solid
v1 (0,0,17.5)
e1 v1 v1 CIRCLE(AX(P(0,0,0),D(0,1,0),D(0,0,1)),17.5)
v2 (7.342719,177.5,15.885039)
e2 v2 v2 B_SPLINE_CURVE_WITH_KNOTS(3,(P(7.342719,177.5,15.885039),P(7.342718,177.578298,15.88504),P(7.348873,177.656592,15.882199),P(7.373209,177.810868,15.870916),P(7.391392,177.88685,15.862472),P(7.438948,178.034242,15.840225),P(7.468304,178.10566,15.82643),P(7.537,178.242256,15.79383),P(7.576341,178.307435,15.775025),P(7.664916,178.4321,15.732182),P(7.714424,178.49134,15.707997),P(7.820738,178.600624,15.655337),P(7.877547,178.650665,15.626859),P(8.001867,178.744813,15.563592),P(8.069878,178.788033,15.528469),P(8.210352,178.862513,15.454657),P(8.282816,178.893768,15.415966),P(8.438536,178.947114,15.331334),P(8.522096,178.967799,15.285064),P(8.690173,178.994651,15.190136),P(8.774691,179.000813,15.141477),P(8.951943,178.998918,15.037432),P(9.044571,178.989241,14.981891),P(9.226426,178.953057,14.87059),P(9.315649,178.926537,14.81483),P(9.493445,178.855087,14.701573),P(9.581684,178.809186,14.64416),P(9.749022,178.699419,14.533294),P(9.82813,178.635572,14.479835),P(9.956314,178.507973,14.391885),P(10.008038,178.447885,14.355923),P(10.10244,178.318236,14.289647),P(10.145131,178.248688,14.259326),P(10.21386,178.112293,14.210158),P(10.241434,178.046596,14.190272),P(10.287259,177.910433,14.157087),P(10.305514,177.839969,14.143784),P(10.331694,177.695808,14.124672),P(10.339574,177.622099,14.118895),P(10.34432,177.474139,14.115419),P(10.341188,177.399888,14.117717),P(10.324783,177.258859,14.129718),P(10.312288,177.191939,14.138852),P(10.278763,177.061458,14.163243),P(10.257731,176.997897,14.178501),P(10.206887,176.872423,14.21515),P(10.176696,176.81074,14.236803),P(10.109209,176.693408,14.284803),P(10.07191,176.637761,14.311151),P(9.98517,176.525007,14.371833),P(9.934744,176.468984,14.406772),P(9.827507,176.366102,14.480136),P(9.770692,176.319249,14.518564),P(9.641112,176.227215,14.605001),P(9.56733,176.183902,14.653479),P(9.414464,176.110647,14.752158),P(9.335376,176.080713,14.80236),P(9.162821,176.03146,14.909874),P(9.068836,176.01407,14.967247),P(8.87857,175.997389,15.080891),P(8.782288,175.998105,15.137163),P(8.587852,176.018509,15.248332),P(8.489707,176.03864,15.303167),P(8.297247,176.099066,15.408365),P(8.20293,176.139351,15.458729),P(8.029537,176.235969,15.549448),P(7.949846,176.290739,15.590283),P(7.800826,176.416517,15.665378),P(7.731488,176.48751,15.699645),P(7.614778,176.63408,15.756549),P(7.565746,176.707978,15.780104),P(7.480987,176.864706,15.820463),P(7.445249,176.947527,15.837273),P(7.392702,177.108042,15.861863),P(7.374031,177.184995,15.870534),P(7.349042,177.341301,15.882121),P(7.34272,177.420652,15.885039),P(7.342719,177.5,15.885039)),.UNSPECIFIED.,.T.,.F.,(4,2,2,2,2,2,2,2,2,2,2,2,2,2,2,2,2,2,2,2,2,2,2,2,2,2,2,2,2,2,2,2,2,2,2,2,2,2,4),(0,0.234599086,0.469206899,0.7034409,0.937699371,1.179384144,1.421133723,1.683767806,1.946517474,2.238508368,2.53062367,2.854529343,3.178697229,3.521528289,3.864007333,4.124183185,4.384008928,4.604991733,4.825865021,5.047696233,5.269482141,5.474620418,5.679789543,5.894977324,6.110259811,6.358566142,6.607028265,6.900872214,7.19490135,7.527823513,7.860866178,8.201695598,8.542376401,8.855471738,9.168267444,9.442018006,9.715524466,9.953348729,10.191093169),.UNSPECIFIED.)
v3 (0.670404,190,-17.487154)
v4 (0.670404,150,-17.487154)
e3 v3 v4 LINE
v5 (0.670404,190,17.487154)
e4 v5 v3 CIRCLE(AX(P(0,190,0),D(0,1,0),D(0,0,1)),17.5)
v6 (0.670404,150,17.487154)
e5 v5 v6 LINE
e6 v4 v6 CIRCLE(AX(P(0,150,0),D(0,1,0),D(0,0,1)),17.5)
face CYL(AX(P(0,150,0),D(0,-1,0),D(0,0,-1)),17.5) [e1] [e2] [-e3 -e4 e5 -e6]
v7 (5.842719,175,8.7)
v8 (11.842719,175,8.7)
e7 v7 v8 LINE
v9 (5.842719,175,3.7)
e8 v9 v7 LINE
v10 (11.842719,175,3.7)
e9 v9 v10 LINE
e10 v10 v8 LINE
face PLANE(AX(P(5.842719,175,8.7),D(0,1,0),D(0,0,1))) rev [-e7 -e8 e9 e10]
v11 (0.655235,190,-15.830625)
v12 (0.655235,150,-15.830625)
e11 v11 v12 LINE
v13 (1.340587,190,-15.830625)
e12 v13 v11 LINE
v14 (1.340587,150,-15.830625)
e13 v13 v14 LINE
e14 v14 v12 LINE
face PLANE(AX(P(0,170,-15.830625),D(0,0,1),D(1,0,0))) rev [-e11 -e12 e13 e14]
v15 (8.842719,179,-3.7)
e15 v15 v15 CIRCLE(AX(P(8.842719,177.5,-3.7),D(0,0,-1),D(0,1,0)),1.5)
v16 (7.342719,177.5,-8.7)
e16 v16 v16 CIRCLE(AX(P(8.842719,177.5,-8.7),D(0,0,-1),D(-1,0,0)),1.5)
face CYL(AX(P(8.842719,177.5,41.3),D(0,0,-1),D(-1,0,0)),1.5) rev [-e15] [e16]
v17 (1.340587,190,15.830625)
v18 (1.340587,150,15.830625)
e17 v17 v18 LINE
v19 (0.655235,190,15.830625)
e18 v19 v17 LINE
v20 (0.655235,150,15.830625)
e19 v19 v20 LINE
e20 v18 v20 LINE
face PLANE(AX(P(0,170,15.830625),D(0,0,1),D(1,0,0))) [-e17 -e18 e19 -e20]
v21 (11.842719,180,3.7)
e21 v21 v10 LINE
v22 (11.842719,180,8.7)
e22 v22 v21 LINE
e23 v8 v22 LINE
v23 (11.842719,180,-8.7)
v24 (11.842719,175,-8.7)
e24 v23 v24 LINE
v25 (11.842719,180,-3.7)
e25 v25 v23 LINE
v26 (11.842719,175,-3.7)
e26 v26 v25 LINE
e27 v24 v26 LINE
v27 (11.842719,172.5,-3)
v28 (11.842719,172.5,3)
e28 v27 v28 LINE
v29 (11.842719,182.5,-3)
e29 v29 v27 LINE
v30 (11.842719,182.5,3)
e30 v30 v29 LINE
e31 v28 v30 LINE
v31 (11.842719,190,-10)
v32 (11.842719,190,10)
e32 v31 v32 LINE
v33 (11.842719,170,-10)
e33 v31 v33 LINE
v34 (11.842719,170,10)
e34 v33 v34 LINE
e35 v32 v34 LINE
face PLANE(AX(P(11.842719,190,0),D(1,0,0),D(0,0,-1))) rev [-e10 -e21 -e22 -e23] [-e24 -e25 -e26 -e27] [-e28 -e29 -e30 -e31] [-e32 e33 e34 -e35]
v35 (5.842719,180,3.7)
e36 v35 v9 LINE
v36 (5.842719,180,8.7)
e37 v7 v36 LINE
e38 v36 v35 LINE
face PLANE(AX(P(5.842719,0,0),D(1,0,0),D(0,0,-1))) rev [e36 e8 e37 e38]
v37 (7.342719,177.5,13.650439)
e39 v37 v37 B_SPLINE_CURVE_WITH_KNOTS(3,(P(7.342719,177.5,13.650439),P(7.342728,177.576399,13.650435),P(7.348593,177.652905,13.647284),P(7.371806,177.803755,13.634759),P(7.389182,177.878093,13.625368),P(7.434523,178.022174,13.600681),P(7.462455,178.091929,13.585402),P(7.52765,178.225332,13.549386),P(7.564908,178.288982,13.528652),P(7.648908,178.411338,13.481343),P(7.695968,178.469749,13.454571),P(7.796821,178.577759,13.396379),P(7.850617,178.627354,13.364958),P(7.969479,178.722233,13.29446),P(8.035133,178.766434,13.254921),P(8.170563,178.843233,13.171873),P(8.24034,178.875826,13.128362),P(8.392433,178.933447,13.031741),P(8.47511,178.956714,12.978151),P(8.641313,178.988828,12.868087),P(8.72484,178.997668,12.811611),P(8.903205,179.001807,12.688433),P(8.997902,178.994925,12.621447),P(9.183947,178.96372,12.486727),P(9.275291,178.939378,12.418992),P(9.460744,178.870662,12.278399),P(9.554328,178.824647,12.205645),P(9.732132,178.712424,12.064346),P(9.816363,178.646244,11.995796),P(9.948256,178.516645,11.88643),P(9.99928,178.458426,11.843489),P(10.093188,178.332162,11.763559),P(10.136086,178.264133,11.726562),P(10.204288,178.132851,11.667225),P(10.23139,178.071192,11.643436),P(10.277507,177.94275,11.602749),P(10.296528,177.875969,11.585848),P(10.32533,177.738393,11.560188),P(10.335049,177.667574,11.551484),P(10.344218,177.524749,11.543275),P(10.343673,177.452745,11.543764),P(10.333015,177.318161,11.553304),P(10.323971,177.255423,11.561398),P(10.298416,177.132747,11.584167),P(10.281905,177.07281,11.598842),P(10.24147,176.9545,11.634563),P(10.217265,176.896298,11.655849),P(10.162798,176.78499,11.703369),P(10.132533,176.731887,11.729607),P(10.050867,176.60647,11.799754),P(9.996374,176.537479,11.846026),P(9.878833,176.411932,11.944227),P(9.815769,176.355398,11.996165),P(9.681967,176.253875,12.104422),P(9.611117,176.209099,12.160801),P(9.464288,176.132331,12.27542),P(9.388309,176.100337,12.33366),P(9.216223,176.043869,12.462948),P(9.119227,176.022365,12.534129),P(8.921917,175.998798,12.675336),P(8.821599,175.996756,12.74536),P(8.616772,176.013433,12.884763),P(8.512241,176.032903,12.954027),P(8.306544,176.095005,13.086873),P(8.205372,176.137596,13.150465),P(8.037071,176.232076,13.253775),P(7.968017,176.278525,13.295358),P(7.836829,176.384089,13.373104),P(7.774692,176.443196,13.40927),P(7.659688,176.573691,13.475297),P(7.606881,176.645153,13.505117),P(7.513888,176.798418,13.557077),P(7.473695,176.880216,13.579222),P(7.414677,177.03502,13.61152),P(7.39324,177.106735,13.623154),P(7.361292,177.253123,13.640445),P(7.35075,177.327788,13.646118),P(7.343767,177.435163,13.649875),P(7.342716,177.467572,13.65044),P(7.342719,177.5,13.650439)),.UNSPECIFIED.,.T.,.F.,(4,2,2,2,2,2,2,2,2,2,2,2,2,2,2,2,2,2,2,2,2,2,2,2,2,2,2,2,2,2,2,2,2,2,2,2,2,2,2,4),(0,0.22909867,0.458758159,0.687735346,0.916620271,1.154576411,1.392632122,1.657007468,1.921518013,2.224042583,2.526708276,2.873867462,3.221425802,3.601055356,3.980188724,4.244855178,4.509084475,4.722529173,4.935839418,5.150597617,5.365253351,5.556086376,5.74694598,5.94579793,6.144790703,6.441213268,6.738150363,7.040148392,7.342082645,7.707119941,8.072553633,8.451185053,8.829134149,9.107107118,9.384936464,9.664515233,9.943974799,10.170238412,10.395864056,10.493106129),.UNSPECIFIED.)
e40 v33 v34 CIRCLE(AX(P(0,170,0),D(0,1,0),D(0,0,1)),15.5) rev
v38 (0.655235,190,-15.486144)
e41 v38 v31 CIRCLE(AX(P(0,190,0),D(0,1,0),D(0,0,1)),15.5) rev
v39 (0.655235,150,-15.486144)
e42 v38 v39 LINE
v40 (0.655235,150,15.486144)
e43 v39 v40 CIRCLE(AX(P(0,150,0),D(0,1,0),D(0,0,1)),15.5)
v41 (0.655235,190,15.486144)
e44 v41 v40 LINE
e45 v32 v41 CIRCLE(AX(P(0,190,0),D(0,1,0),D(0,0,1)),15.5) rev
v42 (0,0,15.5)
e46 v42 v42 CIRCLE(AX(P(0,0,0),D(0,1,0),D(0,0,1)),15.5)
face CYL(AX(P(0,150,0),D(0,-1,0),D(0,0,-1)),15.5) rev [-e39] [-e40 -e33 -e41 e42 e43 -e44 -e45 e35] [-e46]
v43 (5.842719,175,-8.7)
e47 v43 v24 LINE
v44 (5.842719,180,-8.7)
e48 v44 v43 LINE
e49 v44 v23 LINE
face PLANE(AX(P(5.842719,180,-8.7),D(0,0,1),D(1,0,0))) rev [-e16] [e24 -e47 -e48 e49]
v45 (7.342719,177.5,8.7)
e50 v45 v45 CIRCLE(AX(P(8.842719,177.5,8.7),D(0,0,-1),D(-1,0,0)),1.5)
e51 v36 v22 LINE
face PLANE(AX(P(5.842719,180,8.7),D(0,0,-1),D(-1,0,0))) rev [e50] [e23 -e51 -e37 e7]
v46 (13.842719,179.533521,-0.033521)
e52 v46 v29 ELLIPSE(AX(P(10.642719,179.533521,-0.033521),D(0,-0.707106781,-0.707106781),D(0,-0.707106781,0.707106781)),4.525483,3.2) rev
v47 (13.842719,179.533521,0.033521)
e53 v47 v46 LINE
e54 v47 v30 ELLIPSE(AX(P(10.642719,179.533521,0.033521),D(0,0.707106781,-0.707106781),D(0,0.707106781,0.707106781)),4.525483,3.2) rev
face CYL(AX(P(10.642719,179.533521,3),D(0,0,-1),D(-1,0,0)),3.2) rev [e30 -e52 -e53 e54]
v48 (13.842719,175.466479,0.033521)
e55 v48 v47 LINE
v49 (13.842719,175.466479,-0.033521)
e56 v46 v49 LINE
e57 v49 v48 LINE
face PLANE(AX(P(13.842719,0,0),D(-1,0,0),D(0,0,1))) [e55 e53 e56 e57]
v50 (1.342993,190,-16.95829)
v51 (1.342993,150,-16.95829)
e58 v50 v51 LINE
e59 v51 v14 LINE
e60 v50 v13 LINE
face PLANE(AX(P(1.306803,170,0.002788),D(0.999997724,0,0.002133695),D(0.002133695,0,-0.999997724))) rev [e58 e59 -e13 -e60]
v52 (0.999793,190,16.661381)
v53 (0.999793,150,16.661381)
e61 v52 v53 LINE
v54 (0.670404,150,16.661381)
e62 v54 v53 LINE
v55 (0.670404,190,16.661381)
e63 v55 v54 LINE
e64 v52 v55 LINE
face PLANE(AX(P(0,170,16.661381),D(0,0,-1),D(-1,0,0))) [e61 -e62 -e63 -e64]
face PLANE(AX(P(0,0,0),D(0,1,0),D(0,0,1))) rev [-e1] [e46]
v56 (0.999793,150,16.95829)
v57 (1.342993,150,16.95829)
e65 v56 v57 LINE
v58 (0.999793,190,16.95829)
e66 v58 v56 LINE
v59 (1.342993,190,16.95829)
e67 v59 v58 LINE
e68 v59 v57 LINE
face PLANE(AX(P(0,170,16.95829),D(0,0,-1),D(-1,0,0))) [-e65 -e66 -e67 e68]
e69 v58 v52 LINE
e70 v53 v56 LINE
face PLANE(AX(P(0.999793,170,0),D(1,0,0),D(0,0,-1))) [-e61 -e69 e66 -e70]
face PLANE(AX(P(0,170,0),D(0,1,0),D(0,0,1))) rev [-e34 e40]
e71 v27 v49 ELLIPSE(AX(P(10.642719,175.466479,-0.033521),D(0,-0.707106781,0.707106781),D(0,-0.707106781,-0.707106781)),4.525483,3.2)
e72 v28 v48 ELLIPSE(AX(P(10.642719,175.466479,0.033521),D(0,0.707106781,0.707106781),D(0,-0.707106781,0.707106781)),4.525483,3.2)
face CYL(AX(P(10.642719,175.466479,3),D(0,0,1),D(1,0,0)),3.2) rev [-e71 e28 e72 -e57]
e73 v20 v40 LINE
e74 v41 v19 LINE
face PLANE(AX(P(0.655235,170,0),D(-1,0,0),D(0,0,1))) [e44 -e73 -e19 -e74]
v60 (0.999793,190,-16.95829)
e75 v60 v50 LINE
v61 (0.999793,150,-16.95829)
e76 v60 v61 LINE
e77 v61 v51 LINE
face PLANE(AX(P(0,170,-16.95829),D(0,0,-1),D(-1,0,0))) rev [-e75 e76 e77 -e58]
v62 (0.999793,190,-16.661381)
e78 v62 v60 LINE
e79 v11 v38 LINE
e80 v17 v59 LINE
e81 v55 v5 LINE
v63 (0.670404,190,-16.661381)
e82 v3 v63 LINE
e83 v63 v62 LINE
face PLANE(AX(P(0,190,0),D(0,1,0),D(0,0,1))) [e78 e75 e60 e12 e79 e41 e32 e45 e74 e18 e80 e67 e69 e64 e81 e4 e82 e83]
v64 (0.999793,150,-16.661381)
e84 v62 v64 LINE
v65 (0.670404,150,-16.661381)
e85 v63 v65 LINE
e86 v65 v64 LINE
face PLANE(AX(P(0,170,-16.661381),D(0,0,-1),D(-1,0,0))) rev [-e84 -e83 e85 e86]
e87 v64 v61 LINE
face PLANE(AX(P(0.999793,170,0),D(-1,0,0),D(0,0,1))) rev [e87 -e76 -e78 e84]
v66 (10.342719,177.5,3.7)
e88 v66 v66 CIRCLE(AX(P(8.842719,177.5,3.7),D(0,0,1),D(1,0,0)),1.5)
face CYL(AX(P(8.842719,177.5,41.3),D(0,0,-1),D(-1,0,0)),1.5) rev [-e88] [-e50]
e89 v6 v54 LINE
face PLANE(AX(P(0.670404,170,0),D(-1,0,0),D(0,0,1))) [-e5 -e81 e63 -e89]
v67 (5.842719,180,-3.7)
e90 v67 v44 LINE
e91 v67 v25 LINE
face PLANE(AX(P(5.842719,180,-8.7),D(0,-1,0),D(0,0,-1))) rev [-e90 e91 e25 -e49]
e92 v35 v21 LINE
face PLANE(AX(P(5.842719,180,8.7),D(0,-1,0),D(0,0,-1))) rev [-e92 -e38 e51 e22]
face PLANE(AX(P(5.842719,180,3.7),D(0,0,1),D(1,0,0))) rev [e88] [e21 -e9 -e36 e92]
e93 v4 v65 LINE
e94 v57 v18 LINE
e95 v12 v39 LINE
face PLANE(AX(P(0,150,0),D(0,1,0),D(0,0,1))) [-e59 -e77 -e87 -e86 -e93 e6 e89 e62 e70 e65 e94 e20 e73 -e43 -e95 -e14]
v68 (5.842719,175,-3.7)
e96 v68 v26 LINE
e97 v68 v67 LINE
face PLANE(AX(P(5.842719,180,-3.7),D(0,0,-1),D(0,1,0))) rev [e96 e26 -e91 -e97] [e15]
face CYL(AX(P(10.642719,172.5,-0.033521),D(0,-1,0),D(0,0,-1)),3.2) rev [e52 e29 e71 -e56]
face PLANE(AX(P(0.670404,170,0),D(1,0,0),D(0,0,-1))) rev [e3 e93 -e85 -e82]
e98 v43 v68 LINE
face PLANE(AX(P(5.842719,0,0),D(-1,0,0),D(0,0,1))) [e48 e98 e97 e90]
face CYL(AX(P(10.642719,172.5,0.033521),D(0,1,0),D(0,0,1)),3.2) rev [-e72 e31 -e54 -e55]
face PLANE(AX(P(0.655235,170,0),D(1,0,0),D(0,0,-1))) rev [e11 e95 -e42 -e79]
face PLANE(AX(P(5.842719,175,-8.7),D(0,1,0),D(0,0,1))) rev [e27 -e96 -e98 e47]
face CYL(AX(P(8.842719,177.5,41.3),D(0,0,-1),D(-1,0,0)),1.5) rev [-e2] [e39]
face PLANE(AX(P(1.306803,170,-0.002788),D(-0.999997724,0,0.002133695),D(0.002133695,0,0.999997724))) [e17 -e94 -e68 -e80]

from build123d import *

# Parameters (mm, degrees)
SKETCH3_R           = 17.5
SKETCH3_R_2         = 15.5
BOSS_EXTRUDE1_DEPTH = 150
BOSS_EXTRUDE2_DEPTH = 20
BOSS_EXTRUDE3_DEPTH = 20
SKETCH6_W           = 5
SKETCH6_H           = 5
BOSS_EXTRUDE4_DEPTH = 6
SKETCH7_R           = 1.5
CUT_EXTRUDE2_DEPTH  = 50
SKETCH9_W           = 6
SKETCH9_H           = 10
CUT_EXTRUDE3_DEPTH  = 2
FILLET3_R           = 3.2


with BuildPart() as part:
    # Sketch3 → Boss-Extrude1 (new body)
    with BuildSketch(Plane(origin=(0, 0, 0), x_dir=(1, 0, 0), z_dir=(0, 1, 0))):
        with Locations(Location((0, 0, 0), (0, 0, 270))):
            Circle(SKETCH3_R)
        with Locations(Location((0, 0, 0), (0, 0, 270))):
            Circle(SKETCH3_R_2, mode=Mode.SUBTRACT)
    extrude(amount=BOSS_EXTRUDE1_DEPTH)

    # Sketch4 → Boss-Extrude2 (add)
    with BuildSketch(Plane(origin=(0, 150, 0), x_dir=(1, 0, 0), z_dir=(0, 1, 0))):
        with BuildLine():
            ThreePointArc((17.5, 0), (12.609164887, 12.135030319), (0.670404475, 17.487154081))
            Line((0.670404475, 17.487154081), (0.670404475, 16.661380915))
            Line((0.670404475, 16.661380915), (0.999793375, 16.661380915))
            Line((0.999793375, 16.661380915), (0.999793375, 16.95829018))
            Line((0.999793375, 16.95829018), (1.342992881, 16.95829018))
            Line((1.342992881, 16.95829018), (1.340586782, 15.830625123))
            Line((1.340586782, 15.830625123), (0.65523527, 15.830625123))
            Line((0.65523527, 15.830625123), (0.65523527, 15.486144347))
            ThreePointArc((0.65523527, 15.486144347), (11.189417918, 10.725993038), (15.5, 0))
            Line((15.5, 0), (17.5, 0))
        make_face()
        with BuildLine():
            ThreePointArc((0.670404475, -17.487154081), (12.609164887, -12.135030319), (17.5, 0))
            Line((17.5, 0), (15.5, 0))
            ThreePointArc((15.5, 0), (11.189417918, -10.725993038), (0.65523527, -15.486144347))
            Line((0.65523527, -15.486144347), (0.65523527, -15.830625123))
            Line((0.65523527, -15.830625123), (1.340586782, -15.830625123))
            Line((1.340586782, -15.830625123), (1.342992881, -16.95829018))
            Line((1.342992881, -16.95829018), (0.999793375, -16.95829018))
            Line((0.999793375, -16.95829018), (0.999793375, -16.661380915))
            Line((0.999793375, -16.661380915), (0.670404475, -16.661380915))
            Line((0.670404475, -16.661380915), (0.670404475, -17.487154081))
        make_face()
    extrude(amount=BOSS_EXTRUDE2_DEPTH)

    # Sketch5 → Boss-Extrude3 (add)
    with BuildSketch(Plane(origin=(0, 170, 0), x_dir=(1, 0, 0), z_dir=(0, 1, 0))):
        with BuildLine():
            Line((0.65523527, 15.830625123), (0.65523527, 15.486144347))
            ThreePointArc((0.65523527, 15.486144347), (15.5, 0), (0.65523527, -15.486144347))
            Line((0.65523527, -15.486144347), (0.65523527, -15.830625123))
            Line((0.65523527, -15.830625123), (1.340586782, -15.830625123))
            Line((1.340586782, -15.830625123), (1.342992881, -16.95829018))
            Line((1.342992881, -16.95829018), (0.999793375, -16.95829018))
            Line((0.999793375, -16.95829018), (0.999793375, -16.661380915))
            Line((0.999793375, -16.661380915), (0.670404475, -16.661380915))
            Line((0.670404475, -16.661380915), (0.670404475, -17.487154081))
            ThreePointArc((0.670404475, -17.487154081), (17.5, 0), (0.670404475, 17.487154081))
            Line((0.670404475, 17.487154081), (0.670404475, 16.661380915))
            Line((0.670404475, 16.661380915), (0.999793375, 16.661380915))
            Line((0.999793375, 16.661380915), (0.999793375, 16.95829018))
            Line((0.999793375, 16.95829018), (1.342992881, 16.95829018))
            Line((1.342992881, 16.95829018), (1.340586782, 15.830625123))
            Line((1.340586782, 15.830625123), (0.65523527, 15.830625123))
        make_face()
        with BuildLine():
            ThreePointArc((11.842719282, -10), (15.5, 0), (11.842719282, 10))
            Line((11.842719282, 10), (11.842719282, -10))
        make_face()
    extrude(amount=BOSS_EXTRUDE3_DEPTH)

    # Sketch6 → Boss-Extrude4 (add)
    with BuildSketch(Plane.ZY.offset(-11.842719282)):
        with Locations((-6.2, 177.5)):
            Rectangle(SKETCH6_W, SKETCH6_H)
        with Locations((6.2, 177.5)):
            Rectangle(SKETCH6_W, SKETCH6_H)
    extrude(amount=BOSS_EXTRUDE4_DEPTH)

    # Sketch7 → Cut-Extrude2 (cut)
    with BuildSketch(Plane(origin=(0, 0, -8.7), x_dir=(-1, 0, 0), z_dir=(0, 0, -1))):
        with Locations((-8.842719282, 177.5)):
            Circle(SKETCH7_R)
    extrude(amount=-CUT_EXTRUDE2_DEPTH, mode=Mode.SUBTRACT)

    # Sketch9 → Cut-Extrude3 (cut)
    with BuildSketch(Plane.ZY.offset(-11.842719282)):
        with Locations((0, 177.5)):
            Rectangle(SKETCH9_W, SKETCH9_H)
    extrude(amount=-CUT_EXTRUDE3_DEPTH, mode=Mode.SUBTRACT)

    # Fillet3
    # the kernel refuses this fillet: 3.2 mm, written as the material it adds along each edge
    with BuildSketch(Plane(origin=(13.842719282, 172.5, -3), x_dir=(-1, 0, 0), z_dir=(0, 1, 0)), Plane(origin=(13.842719282, 189.916198487, 3), x_dir=(-1, 0, 0), z_dir=(0, -1, 0))) as fillet3_piece_1:
        with BuildLine():
            CenterArc((3.2, 2.966479395), FILLET3_R, 180, 67.975687163)
            Line((0, 2.966479395), (-0.064, 2.966479395))
            Line((-0.064, 2.966479395), (-0.064, 0))
            Line((-0.064, 0), (0, -0.064))
            ThreePointArc((0, -0.064), (1, -0.064), (1.976, -0.059329588))
            Line((1.976, -0.059329588), (2, 0))
        make_face()
    extrude(amount=17.416198487)
    with BuildSketch(Plane(origin=(13.842719282, 172.5, 10.416198487), x_dir=(-1, 0, 0), z_dir=(0, 0, -1)), Plane(origin=(13.842719282, 182.5, -10.416198487), x_dir=(-1, 0, 0), z_dir=(0, 0, 1))) as fillet3_piece_2:
        with BuildLine():
            CenterArc((3.2, 2.966479395), FILLET3_R, 180, 67.975687163)
            Line((0, 2.966479395), (-0.064, 2.966479395))
            Line((-0.064, 2.966479395), (-0.064, 0))
            Line((-0.064, 0), (0, -0.064))
            ThreePointArc((0, -0.064), (1, -0.064), (1.976, -0.059329588))
            Line((1.976, -0.059329588), (2, 0))
        make_face()
    extrude(amount=20.832396974)


solid = part.part
